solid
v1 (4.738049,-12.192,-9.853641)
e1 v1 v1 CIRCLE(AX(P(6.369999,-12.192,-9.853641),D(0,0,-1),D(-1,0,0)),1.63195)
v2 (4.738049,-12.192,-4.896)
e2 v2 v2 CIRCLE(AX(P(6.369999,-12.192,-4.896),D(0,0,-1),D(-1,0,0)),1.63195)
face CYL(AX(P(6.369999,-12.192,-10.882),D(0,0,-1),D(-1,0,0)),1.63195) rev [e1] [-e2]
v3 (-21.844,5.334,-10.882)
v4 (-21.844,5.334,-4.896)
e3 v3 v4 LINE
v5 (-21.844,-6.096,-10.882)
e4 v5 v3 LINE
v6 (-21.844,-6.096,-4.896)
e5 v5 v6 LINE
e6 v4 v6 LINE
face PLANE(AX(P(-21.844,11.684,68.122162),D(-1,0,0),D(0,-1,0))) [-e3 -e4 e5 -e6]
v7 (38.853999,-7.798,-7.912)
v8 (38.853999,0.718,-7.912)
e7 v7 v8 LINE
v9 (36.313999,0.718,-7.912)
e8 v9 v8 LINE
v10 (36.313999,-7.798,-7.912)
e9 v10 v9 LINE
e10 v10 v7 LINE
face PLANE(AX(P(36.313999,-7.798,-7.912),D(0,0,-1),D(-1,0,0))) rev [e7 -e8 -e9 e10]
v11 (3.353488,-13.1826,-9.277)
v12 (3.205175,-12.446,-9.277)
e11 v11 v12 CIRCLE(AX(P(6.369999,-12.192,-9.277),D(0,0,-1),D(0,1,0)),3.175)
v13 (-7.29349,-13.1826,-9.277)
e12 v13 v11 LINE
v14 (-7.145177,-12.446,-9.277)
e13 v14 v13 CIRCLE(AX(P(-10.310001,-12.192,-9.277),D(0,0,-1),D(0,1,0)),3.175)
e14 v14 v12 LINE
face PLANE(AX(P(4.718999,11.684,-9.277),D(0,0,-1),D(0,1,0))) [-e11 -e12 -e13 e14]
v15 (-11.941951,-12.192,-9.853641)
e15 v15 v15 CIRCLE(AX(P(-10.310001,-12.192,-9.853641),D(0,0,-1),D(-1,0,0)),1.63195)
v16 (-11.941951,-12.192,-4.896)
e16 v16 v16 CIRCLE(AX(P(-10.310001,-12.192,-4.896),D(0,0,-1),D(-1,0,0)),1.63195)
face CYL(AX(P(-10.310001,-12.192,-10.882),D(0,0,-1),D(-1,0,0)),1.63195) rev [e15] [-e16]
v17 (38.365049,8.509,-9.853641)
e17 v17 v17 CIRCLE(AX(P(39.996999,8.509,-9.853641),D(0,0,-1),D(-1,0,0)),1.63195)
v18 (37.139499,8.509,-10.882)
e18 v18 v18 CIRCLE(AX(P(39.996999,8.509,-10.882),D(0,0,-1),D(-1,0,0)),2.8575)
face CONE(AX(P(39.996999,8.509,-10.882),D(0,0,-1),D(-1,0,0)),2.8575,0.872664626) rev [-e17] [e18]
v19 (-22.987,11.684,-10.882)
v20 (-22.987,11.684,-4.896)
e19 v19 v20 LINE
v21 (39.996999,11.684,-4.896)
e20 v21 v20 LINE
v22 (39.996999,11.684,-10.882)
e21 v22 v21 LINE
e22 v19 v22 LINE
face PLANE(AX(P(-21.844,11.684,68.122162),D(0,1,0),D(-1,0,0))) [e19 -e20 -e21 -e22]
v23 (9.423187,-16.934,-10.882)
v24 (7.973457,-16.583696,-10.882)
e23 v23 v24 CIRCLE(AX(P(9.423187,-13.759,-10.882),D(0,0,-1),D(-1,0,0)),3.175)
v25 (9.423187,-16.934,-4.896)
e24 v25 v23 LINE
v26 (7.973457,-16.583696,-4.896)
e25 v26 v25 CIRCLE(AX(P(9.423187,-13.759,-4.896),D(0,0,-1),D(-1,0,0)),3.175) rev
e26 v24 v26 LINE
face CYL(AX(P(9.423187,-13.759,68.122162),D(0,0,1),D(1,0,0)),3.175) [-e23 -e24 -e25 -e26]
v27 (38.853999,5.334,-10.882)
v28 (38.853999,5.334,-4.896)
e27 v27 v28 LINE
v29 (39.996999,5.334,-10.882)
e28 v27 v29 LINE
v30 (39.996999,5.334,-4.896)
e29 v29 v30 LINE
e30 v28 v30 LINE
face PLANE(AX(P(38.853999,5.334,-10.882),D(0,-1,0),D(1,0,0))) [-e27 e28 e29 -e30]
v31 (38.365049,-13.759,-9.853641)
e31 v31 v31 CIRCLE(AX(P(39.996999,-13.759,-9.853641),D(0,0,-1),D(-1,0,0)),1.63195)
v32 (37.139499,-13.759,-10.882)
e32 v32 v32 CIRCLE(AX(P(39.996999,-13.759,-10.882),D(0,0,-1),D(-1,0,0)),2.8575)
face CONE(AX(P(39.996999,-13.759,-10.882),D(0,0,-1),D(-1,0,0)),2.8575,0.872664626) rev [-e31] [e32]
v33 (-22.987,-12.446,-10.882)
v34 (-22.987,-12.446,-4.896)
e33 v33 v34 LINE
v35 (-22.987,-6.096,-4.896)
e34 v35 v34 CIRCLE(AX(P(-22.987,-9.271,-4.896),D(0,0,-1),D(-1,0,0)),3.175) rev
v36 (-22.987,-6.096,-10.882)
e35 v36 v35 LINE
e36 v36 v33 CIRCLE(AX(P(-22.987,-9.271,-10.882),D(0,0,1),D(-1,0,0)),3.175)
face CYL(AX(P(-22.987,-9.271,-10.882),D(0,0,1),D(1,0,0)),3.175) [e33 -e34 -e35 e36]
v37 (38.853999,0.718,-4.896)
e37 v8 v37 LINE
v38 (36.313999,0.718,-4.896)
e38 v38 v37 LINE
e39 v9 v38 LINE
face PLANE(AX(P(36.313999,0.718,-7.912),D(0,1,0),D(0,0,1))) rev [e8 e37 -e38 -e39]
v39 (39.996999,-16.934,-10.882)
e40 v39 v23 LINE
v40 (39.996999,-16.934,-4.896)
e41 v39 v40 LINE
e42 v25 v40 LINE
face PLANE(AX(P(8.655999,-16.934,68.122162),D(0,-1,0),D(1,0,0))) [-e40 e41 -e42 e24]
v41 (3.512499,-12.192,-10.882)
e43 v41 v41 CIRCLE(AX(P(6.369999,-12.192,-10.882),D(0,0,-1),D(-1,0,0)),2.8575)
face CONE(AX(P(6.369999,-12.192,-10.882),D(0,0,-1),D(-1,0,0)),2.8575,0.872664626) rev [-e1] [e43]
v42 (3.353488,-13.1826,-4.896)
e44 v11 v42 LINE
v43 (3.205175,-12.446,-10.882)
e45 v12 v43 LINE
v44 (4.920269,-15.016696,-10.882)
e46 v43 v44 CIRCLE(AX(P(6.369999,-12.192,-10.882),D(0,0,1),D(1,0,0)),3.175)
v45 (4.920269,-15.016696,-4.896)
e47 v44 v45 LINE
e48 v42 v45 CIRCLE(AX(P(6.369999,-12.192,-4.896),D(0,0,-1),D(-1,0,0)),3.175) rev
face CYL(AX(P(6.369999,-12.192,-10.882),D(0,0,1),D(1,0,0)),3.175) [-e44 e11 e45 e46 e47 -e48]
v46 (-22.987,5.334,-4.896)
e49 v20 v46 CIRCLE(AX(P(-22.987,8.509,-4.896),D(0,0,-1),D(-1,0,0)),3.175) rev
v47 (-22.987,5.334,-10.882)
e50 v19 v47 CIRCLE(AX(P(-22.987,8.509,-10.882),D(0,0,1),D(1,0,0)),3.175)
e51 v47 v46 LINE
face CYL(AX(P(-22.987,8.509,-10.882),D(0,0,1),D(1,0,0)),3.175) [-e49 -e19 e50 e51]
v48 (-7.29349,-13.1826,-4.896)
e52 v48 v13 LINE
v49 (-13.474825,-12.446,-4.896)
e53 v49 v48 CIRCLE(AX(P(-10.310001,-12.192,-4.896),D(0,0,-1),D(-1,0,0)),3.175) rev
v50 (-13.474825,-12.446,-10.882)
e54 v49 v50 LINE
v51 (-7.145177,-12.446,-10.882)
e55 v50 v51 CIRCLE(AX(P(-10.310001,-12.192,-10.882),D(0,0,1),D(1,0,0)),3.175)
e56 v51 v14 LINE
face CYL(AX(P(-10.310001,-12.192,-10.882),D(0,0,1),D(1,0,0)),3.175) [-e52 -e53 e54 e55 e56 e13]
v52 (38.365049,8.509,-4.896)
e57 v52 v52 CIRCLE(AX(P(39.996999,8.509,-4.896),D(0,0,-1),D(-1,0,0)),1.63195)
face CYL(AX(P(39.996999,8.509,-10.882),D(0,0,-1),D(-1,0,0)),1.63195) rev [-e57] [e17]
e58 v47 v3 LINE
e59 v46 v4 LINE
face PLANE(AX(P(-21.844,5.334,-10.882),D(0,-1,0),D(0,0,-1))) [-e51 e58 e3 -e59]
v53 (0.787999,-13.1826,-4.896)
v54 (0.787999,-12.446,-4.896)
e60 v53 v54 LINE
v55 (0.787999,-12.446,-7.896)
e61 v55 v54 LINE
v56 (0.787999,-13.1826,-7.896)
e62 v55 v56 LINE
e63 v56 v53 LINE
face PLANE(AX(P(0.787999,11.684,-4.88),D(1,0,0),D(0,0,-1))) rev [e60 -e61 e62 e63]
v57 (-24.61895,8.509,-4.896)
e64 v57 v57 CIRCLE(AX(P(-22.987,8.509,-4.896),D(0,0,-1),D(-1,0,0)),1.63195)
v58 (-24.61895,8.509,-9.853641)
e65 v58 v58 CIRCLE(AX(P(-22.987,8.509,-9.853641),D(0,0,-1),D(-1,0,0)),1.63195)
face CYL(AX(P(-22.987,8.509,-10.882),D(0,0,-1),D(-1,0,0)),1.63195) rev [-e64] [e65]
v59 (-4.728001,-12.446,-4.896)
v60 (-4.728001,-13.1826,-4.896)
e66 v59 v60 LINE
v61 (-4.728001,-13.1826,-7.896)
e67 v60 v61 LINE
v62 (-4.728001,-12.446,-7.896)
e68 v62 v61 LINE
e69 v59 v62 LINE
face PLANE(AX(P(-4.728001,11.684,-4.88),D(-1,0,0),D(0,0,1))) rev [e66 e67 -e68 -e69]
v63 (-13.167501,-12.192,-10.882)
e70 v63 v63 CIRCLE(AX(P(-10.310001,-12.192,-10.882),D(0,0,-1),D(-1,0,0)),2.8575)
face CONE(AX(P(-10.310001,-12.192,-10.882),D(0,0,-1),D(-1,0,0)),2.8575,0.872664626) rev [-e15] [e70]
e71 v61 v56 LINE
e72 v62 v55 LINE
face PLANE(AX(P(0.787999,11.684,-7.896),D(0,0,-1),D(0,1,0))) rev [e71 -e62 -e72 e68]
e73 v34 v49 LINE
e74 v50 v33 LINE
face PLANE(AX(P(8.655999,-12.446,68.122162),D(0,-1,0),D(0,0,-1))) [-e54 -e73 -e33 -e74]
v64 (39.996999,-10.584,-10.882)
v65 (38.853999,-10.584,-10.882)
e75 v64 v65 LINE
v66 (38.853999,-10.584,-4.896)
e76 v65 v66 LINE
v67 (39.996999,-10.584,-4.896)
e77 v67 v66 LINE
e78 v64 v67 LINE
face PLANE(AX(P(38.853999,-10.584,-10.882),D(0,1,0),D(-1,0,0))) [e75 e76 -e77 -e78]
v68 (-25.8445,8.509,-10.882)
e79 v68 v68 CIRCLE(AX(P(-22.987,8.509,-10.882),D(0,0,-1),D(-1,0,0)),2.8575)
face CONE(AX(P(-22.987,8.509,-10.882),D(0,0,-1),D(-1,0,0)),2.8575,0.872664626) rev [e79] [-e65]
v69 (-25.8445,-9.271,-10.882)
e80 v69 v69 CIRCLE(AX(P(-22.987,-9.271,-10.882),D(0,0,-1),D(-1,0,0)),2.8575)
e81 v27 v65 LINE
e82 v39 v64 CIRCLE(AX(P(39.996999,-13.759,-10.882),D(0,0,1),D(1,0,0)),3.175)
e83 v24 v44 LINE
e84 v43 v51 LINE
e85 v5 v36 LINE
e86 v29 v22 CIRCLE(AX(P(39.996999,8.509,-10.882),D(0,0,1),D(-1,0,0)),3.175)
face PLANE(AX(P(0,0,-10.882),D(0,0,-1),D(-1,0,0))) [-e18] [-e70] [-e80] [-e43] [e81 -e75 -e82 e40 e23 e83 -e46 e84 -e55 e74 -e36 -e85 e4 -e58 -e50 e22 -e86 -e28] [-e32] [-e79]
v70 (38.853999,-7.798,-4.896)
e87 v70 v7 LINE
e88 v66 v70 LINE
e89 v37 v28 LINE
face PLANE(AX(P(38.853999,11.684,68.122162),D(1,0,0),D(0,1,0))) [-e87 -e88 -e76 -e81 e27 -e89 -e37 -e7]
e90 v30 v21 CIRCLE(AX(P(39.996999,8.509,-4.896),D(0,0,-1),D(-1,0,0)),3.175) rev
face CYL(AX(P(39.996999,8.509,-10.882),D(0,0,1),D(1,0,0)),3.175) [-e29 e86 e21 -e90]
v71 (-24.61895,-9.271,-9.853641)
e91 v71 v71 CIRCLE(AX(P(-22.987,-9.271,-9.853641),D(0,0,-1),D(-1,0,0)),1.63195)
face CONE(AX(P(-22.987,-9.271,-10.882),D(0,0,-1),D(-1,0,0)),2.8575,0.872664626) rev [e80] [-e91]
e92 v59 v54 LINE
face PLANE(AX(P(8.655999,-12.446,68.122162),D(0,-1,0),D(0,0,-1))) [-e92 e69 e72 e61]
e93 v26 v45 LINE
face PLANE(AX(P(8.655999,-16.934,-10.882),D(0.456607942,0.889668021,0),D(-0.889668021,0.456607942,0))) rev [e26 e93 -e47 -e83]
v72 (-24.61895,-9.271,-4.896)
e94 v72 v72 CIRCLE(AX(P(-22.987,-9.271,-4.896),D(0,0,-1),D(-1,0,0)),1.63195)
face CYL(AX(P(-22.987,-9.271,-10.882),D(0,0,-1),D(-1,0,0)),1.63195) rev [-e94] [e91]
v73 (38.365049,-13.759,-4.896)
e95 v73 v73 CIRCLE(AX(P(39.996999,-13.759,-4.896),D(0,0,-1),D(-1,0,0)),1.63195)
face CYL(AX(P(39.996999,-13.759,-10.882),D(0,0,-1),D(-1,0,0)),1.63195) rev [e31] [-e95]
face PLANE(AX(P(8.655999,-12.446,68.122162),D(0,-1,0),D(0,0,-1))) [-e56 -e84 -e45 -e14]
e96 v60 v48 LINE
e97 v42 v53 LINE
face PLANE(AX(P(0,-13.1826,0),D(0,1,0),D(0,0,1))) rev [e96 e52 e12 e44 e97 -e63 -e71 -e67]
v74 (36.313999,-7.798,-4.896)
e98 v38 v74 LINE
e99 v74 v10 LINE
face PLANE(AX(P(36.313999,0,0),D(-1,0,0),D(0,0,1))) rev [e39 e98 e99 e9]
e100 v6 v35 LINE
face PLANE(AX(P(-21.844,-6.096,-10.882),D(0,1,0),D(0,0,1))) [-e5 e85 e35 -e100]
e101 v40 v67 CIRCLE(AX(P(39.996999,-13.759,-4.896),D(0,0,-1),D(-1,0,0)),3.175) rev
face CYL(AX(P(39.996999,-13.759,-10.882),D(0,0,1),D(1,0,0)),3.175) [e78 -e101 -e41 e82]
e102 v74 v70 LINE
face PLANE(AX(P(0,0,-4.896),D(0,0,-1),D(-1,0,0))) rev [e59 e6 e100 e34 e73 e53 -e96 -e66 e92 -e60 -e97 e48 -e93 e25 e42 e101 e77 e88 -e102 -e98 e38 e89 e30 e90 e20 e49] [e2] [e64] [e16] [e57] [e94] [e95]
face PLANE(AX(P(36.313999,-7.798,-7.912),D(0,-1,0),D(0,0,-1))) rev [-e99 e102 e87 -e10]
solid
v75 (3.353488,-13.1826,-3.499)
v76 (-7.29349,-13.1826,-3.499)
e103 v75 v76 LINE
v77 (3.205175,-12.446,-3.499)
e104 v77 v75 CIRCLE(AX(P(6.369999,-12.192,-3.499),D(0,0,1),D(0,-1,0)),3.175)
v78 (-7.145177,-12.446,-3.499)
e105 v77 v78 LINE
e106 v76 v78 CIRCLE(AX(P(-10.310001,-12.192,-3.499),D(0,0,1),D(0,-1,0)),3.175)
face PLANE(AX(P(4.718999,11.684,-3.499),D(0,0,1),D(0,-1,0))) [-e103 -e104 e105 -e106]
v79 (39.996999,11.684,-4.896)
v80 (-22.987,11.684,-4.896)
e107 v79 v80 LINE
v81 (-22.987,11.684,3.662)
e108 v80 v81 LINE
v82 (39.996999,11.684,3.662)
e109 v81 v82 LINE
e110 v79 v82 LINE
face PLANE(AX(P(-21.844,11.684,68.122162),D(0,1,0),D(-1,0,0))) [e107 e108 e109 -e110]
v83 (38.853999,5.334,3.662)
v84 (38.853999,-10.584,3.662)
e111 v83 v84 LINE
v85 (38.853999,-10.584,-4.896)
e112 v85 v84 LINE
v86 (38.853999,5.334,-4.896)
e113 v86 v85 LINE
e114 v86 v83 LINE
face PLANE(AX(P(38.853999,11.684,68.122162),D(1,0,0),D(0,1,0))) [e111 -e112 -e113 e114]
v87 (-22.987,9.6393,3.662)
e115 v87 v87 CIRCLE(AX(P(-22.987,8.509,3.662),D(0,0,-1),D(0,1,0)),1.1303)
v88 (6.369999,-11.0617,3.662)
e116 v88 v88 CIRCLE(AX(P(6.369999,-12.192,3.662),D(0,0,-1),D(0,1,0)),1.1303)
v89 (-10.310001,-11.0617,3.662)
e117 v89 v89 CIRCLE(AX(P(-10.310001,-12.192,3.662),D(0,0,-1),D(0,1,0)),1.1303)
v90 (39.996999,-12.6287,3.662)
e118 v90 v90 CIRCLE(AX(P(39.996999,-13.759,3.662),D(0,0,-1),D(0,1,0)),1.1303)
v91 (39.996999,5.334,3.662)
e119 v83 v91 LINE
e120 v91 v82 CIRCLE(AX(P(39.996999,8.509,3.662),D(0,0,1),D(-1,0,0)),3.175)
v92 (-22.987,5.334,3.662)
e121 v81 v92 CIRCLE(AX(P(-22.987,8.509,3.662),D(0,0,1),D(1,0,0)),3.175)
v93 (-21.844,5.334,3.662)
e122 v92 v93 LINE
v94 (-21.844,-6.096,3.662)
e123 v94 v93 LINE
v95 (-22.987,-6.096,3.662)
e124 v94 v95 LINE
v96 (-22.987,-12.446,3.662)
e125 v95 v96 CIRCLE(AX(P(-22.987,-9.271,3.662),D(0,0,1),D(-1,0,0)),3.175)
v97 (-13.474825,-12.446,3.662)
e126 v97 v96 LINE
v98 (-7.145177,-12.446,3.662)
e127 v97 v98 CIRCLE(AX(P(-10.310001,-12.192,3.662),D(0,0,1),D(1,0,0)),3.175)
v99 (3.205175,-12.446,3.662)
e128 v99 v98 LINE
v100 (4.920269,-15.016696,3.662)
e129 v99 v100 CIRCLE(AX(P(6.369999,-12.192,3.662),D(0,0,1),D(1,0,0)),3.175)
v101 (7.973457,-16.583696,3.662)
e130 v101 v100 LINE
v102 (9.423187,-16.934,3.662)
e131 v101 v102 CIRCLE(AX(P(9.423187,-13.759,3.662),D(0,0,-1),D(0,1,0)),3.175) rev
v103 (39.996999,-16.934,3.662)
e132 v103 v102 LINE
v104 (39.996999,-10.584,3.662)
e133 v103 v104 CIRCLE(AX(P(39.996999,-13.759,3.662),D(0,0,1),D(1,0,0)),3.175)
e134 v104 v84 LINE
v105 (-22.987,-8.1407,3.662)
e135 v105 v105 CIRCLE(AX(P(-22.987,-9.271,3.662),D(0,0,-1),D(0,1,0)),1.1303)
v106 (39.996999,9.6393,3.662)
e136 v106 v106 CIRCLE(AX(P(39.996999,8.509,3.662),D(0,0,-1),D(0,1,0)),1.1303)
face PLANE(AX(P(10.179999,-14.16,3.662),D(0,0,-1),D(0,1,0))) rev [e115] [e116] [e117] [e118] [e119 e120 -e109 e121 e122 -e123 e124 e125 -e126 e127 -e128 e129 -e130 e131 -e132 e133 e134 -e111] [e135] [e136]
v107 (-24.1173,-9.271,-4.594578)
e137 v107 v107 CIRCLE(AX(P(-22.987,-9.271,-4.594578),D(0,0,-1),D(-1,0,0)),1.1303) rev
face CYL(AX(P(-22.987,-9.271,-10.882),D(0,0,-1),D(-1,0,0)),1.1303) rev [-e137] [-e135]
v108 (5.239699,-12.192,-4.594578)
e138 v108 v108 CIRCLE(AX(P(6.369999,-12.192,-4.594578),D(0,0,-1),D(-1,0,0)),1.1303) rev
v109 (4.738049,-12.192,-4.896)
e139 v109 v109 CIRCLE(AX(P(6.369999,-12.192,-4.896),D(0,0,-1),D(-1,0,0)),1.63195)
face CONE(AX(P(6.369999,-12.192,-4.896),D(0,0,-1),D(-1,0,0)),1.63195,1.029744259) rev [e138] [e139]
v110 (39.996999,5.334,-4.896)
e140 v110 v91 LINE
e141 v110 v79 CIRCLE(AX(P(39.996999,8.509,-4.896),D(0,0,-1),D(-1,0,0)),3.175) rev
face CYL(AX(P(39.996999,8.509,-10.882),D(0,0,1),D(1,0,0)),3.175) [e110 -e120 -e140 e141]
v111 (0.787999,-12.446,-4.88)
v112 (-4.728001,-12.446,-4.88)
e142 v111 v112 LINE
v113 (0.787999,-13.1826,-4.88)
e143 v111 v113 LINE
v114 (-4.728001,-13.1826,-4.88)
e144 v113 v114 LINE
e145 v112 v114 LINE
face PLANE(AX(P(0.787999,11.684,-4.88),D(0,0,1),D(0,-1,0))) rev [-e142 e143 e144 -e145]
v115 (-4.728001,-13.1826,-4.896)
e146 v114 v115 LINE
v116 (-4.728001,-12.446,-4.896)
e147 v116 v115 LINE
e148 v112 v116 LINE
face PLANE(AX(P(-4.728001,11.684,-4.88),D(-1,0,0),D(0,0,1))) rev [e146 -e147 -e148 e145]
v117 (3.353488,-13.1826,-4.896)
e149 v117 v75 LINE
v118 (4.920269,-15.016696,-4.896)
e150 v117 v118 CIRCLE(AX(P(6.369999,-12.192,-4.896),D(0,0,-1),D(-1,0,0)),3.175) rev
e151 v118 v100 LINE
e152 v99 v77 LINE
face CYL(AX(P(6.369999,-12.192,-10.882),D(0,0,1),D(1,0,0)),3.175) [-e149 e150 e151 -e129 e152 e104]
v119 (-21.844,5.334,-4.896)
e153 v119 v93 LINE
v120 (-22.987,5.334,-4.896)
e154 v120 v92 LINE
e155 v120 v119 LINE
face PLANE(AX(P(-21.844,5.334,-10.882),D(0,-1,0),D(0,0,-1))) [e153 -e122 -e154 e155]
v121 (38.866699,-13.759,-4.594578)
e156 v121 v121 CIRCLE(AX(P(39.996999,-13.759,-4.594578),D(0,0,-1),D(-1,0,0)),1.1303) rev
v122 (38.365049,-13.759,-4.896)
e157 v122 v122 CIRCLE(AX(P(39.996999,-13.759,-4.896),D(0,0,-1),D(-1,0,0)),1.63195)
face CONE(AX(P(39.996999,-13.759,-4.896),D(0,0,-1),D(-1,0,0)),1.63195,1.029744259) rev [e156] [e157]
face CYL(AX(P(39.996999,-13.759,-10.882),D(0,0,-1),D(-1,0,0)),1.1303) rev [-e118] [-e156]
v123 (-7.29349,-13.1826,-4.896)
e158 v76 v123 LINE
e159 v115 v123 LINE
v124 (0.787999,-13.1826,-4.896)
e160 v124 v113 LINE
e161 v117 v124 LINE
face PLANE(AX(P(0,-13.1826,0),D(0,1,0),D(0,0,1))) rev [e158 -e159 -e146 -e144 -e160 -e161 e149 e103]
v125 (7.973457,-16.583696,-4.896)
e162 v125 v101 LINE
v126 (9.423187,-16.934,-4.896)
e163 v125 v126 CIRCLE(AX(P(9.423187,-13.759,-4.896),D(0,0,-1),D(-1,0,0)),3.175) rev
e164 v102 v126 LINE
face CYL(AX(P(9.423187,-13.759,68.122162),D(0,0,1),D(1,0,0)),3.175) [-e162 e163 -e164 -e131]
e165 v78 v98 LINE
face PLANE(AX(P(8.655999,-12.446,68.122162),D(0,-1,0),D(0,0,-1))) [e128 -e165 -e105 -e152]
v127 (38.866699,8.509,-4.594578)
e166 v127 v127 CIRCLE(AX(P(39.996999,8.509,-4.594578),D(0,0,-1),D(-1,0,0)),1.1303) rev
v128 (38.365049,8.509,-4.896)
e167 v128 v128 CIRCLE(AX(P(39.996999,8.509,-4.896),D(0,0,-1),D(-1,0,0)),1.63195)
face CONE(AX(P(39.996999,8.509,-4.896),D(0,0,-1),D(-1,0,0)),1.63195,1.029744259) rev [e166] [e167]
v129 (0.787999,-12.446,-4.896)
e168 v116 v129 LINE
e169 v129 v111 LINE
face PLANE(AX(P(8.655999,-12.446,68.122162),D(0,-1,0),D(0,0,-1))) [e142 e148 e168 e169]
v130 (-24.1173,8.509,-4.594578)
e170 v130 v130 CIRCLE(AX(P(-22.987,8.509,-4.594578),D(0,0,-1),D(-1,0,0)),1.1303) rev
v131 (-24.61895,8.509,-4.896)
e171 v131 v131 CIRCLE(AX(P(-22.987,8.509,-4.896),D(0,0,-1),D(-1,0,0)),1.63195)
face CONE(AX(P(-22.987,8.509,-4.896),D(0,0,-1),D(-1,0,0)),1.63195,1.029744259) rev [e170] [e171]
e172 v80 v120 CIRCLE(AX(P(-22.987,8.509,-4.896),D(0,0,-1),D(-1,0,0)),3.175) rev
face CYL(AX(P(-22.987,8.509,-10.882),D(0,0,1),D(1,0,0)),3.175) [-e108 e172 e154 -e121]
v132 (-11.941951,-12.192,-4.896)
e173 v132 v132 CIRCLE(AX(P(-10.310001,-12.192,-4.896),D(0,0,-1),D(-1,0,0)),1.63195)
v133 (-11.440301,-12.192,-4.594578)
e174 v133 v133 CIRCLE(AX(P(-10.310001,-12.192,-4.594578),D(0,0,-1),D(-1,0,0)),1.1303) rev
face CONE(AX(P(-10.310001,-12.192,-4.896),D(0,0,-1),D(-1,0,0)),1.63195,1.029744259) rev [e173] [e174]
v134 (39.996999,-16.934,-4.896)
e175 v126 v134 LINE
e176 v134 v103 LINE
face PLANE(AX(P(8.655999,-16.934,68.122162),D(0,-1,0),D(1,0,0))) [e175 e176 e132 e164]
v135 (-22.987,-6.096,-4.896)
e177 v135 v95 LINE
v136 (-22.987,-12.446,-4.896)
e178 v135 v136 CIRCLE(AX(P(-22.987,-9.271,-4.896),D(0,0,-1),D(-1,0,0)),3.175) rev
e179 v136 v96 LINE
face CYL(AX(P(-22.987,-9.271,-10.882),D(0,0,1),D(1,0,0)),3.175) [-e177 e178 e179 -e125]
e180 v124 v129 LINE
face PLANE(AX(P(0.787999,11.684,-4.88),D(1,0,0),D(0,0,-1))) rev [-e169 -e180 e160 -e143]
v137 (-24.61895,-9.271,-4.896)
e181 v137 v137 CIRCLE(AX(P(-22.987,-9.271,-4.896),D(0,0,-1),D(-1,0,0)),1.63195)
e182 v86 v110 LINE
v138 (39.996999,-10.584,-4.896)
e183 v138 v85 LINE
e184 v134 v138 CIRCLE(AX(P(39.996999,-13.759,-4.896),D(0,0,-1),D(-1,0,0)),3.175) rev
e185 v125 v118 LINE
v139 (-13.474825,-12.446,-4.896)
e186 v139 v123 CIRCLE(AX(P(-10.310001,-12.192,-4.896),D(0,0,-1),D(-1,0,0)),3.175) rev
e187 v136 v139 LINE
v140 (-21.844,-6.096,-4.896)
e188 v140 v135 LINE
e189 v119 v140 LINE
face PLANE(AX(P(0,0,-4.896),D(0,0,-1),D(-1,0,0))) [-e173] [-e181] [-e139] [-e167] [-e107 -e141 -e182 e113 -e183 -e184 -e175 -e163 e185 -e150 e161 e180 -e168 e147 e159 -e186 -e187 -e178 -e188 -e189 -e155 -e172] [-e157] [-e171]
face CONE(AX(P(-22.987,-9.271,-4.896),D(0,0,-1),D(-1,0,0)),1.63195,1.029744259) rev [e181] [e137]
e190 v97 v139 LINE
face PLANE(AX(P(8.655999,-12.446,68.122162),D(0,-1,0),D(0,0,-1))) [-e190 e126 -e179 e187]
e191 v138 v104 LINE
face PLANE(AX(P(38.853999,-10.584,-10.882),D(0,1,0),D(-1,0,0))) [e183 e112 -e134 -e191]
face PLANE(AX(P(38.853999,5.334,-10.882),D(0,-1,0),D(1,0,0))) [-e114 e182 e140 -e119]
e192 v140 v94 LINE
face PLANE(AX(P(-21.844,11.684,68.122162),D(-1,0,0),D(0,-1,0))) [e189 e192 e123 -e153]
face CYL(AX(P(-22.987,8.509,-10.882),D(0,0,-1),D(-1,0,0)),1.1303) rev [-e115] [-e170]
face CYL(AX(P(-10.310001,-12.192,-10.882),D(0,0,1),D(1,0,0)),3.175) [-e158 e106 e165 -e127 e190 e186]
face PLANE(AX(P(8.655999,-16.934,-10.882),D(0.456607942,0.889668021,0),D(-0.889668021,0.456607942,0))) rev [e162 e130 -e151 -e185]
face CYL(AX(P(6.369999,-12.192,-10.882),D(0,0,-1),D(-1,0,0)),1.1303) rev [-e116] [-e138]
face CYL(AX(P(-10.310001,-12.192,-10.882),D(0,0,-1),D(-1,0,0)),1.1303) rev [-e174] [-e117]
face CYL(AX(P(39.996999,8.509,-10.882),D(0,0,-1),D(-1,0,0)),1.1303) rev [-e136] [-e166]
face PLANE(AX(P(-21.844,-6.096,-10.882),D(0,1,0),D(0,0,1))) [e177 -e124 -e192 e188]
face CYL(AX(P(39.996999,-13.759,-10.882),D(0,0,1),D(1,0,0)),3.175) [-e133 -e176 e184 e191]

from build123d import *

# Parameters (mm, degrees)
BOSS_EXTRUDE6_START                               = 1.778
BOSS_EXTRUDE6_DEPTH                               = 11.39
SKETCH2_W                                         = 3.016
SKETCH2_H                                         = 8.516
CUT_EXTRUDE1_DEPTH                                = 2.54
SKETCH3_W                                         = 13.378
SKETCH3_H                                         = 5.778
SKETCH3_W_2                                       = 5.516
SKETCH3_H_2                                       = 3.016
BOSS_EXTRUDE2_DEPTH                               = 0.508
BOSS_EXTRUDE2_DIRECTION_2_REACH                   = 49.132
BOSS_EXTRUDE4_DEPTH                               = 3.154
SKETCH6_R                                         = 3.175
BOSS_EXTRUDE3_DEPTH                               = 14.544
BOSS_EXTRUDE7_DEPTH                               = 14.544
CSK_FOR_4_FLAT_HEAD_MACHINE_SCREW_100_D           = 3.2639
CSK_FOR_4_FLAT_HEAD_MACHINE_SCREW_100_DEPTH       = 5.985
CSK_FOR_4_FLAT_HEAD_MACHINE_SCREW_100_CSINK_D     = 5.715
CSK_FOR_4_FLAT_HEAD_MACHINE_SCREW_100_CSINK_ANGLE = 100
CSK_FOR_4_FLAT_HEAD_MACHINE_SCREW_100_TIP         = 0.980574487
TAP_DRILL_FOR_4_40_TAP1_D                         = 2.2606
FILLET1_R                                         = 3.175


# Read off the part's stored shape, not the designer's step: Split1
with BuildPart() as part:
    # Sketch16 → Boss-Extrude6 (new body)
    with BuildSketch(Plane(origin=(0, 0, -9.104), x_dir=(-1, 0, 0), z_dir=(0, 0, -1)).offset(BOSS_EXTRUDE6_START)):
        Polygon((-8.655999008, -16.934), (-8.655999008, -12.446), (21.844, -12.446), (21.844, -11.684), (21.844, 11.684), (-38.853999008, 11.684), (-38.853999008, -16.934), align=None)
    extrude(amount=-BOSS_EXTRUDE6_DEPTH)

    # Sketch2 → Cut-Extrude1 (cut)
    with BuildSketch(Plane(origin=(38.853999008, 0, 0), x_dir=(0, 0, -1), z_dir=(1, 0, 0))):
        with Locations((6.404, -3.54)):
            Rectangle(SKETCH2_W, SKETCH2_H)
    extrude(amount=-CUT_EXTRUDE1_DEPTH, mode=Mode.SUBTRACT)

    # Sketch3 → Boss-Extrude2 (add)
    with BuildSketch(Plane.XZ.offset(12.6746)):
        with Locations((-1.970000992, -6.388)):
            Rectangle(SKETCH3_W, SKETCH3_H)
        with Locations((-1.970000992, -6.388)):
            Rectangle(SKETCH3_W_2, SKETCH3_H_2, mode=Mode.SUBTRACT)
    extrude(amount=BOSS_EXTRUDE2_DEPTH)

    # Sketch3 → Boss-Extrude2 direction 2 (add, up to next)
    with BuildSketch(Plane.XZ.offset(12.6746), mode=Mode.PRIVATE) as boss_extrude2_direction_2_sk1:
        with Locations((-1.970000992, -6.388)):
            Rectangle(SKETCH3_W, SKETCH3_H)
        with Locations((-1.970000992, -6.388)):
            Rectangle(SKETCH3_W_2, SKETCH3_H_2, mode=Mode.SUBTRACT)
    boss_extrude2_direction_2_tool1 = extrude(boss_extrude2_direction_2_sk1.sketch, amount=-BOSS_EXTRUDE2_DIRECTION_2_REACH, mode=Mode.PRIVATE) - part.part
    add(boss_extrude2_direction_2_tool1.solids().sort_by_distance((-1.970001, -12.6746, -9.131276))[0])

    # Sketch14 → Boss-Extrude4 (add)
    with BuildSketch(Plane.XY.offset(0.508)):
        Polygon((-21.844, 11.684), (38.853999008, 11.684), (38.853999008, -16.934), (8.655999008, -16.934), (8.655999008, -12.446), (-21.844, -12.446), align=None)
    extrude(amount=BOSS_EXTRUDE4_DEPTH)

    # Sketch6 → Boss-Extrude3 (add, through all)
    with BuildSketch(Plane.XY.offset(3.662)):
        with Locations((-10.310000992, -12.192)):
            Circle(SKETCH6_R)
        with Locations((6.369999008, -12.192)):
            Circle(SKETCH6_R)
        with BuildLine():
            Line((-21.844, 11.684), (-22.987, 11.684))
            ThreePointArc((-22.987, 11.684), (-26.162, 8.509), (-22.987, 5.334))
            Line((-22.987, 5.334), (-21.844, 5.334))
            Line((-21.844, 5.334), (-21.844, 11.684))
        make_face()
        with BuildLine():
            Line((38.853999008, 5.334), (39.996999008, 5.334))
            ThreePointArc((39.996999008, 5.334), (43.171999008, 8.509), (39.996999008, 11.684))
            Line((39.996999008, 11.684), (38.853999008, 11.684))
            Line((38.853999008, 11.684), (38.853999008, 5.334))
        make_face()
        with BuildLine():
            Line((-21.844, -6.096), (-22.987, -6.096))
            ThreePointArc((-22.987, -6.096), (-26.162, -9.271), (-22.987, -12.446))
            Line((-22.987, -12.446), (-21.844, -12.446))
            Line((-21.844, -12.446), (-21.844, -6.096))
        make_face()
        with BuildLine():
            Line((38.853999008, -16.934), (39.996999008, -16.934))
            ThreePointArc((39.996999008, -16.934), (43.171999008, -13.759), (39.996999008, -10.584))
            Line((39.996999008, -10.584), (38.853999008, -10.584))
            Line((38.853999008, -10.584), (38.853999008, -16.934))
        make_face()
    extrude(amount=-BOSS_EXTRUDE3_DEPTH)

    # Sketch17 → Boss-Extrude7 (add)
    with BuildSketch(Plane(origin=(0, 0, 3.662), x_dir=(-1, 0, 0), z_dir=(0, 0, -1))):
        Polygon((-8.655999008, -16.934), (-4.920268793, -15.016695966), (-8.655999008, -14.39536765), align=None)
    extrude(amount=BOSS_EXTRUDE7_DEPTH)

    # CSK for #4 Flat Head Machine Screw (100)1
    with Locations(Plane(origin=(0, 0, -10.882), x_dir=(1, 0, 0), z_dir=(0, 0, -1))):
        with Locations((39.996999008, -8.509), (39.996999008, 13.759), (-22.987, 9.271), (-22.987, -8.509), (-10.310000992, 12.192), (6.369999008, 12.192)):
            CounterSinkHole(CSK_FOR_4_FLAT_HEAD_MACHINE_SCREW_100_D / 2, CSK_FOR_4_FLAT_HEAD_MACHINE_SCREW_100_CSINK_D / 2, depth=CSK_FOR_4_FLAT_HEAD_MACHINE_SCREW_100_DEPTH, counter_sink_angle=CSK_FOR_4_FLAT_HEAD_MACHINE_SCREW_100_CSINK_ANGLE)
            with Locations((0, 0, -(CSK_FOR_4_FLAT_HEAD_MACHINE_SCREW_100_DEPTH + CSK_FOR_4_FLAT_HEAD_MACHINE_SCREW_100_TIP / 2))):  # 118° drill point
                Cone(0, CSK_FOR_4_FLAT_HEAD_MACHINE_SCREW_100_D / 2, CSK_FOR_4_FLAT_HEAD_MACHINE_SCREW_100_TIP, mode=Mode.SUBTRACT)

    # Tap Drill for #4-40 Tap1 (through all)
    with Locations(Plane(origin=(0, 0, -10.882), x_dir=(1, 0, 0), z_dir=(0, 0, -1))):
        with Locations((39.996999008, -8.509), (39.996999008, 13.759), (-22.987, 9.271), (-22.987, -8.509), (-10.310000992, 12.192), (6.369999008, 12.192)):
            Hole(TAP_DRILL_FOR_4_40_TAP1_D / 2)

    # Fillet1
    fillet1_edges = [part.edges().sort_by_distance(p)[0] for p in [
        (8.655999008, -16.934, -3.61),
    ]]
    fillet(fillet1_edges, radius=FILLET1_R)


with BuildPart() as body_2:
    # Split1: the piece on the far side of the plane
    add(part.part)
    split(bisect_by=Plane.XY.offset(-4.896), keep=Keep.BOTTOM)


with BuildPart() as part_1:
    add(part.part)

    # Split1
    split(bisect_by=Plane.XY.offset(-4.896), keep=Keep.TOP)


solid = Compound([body_2.part, part_1.part])
